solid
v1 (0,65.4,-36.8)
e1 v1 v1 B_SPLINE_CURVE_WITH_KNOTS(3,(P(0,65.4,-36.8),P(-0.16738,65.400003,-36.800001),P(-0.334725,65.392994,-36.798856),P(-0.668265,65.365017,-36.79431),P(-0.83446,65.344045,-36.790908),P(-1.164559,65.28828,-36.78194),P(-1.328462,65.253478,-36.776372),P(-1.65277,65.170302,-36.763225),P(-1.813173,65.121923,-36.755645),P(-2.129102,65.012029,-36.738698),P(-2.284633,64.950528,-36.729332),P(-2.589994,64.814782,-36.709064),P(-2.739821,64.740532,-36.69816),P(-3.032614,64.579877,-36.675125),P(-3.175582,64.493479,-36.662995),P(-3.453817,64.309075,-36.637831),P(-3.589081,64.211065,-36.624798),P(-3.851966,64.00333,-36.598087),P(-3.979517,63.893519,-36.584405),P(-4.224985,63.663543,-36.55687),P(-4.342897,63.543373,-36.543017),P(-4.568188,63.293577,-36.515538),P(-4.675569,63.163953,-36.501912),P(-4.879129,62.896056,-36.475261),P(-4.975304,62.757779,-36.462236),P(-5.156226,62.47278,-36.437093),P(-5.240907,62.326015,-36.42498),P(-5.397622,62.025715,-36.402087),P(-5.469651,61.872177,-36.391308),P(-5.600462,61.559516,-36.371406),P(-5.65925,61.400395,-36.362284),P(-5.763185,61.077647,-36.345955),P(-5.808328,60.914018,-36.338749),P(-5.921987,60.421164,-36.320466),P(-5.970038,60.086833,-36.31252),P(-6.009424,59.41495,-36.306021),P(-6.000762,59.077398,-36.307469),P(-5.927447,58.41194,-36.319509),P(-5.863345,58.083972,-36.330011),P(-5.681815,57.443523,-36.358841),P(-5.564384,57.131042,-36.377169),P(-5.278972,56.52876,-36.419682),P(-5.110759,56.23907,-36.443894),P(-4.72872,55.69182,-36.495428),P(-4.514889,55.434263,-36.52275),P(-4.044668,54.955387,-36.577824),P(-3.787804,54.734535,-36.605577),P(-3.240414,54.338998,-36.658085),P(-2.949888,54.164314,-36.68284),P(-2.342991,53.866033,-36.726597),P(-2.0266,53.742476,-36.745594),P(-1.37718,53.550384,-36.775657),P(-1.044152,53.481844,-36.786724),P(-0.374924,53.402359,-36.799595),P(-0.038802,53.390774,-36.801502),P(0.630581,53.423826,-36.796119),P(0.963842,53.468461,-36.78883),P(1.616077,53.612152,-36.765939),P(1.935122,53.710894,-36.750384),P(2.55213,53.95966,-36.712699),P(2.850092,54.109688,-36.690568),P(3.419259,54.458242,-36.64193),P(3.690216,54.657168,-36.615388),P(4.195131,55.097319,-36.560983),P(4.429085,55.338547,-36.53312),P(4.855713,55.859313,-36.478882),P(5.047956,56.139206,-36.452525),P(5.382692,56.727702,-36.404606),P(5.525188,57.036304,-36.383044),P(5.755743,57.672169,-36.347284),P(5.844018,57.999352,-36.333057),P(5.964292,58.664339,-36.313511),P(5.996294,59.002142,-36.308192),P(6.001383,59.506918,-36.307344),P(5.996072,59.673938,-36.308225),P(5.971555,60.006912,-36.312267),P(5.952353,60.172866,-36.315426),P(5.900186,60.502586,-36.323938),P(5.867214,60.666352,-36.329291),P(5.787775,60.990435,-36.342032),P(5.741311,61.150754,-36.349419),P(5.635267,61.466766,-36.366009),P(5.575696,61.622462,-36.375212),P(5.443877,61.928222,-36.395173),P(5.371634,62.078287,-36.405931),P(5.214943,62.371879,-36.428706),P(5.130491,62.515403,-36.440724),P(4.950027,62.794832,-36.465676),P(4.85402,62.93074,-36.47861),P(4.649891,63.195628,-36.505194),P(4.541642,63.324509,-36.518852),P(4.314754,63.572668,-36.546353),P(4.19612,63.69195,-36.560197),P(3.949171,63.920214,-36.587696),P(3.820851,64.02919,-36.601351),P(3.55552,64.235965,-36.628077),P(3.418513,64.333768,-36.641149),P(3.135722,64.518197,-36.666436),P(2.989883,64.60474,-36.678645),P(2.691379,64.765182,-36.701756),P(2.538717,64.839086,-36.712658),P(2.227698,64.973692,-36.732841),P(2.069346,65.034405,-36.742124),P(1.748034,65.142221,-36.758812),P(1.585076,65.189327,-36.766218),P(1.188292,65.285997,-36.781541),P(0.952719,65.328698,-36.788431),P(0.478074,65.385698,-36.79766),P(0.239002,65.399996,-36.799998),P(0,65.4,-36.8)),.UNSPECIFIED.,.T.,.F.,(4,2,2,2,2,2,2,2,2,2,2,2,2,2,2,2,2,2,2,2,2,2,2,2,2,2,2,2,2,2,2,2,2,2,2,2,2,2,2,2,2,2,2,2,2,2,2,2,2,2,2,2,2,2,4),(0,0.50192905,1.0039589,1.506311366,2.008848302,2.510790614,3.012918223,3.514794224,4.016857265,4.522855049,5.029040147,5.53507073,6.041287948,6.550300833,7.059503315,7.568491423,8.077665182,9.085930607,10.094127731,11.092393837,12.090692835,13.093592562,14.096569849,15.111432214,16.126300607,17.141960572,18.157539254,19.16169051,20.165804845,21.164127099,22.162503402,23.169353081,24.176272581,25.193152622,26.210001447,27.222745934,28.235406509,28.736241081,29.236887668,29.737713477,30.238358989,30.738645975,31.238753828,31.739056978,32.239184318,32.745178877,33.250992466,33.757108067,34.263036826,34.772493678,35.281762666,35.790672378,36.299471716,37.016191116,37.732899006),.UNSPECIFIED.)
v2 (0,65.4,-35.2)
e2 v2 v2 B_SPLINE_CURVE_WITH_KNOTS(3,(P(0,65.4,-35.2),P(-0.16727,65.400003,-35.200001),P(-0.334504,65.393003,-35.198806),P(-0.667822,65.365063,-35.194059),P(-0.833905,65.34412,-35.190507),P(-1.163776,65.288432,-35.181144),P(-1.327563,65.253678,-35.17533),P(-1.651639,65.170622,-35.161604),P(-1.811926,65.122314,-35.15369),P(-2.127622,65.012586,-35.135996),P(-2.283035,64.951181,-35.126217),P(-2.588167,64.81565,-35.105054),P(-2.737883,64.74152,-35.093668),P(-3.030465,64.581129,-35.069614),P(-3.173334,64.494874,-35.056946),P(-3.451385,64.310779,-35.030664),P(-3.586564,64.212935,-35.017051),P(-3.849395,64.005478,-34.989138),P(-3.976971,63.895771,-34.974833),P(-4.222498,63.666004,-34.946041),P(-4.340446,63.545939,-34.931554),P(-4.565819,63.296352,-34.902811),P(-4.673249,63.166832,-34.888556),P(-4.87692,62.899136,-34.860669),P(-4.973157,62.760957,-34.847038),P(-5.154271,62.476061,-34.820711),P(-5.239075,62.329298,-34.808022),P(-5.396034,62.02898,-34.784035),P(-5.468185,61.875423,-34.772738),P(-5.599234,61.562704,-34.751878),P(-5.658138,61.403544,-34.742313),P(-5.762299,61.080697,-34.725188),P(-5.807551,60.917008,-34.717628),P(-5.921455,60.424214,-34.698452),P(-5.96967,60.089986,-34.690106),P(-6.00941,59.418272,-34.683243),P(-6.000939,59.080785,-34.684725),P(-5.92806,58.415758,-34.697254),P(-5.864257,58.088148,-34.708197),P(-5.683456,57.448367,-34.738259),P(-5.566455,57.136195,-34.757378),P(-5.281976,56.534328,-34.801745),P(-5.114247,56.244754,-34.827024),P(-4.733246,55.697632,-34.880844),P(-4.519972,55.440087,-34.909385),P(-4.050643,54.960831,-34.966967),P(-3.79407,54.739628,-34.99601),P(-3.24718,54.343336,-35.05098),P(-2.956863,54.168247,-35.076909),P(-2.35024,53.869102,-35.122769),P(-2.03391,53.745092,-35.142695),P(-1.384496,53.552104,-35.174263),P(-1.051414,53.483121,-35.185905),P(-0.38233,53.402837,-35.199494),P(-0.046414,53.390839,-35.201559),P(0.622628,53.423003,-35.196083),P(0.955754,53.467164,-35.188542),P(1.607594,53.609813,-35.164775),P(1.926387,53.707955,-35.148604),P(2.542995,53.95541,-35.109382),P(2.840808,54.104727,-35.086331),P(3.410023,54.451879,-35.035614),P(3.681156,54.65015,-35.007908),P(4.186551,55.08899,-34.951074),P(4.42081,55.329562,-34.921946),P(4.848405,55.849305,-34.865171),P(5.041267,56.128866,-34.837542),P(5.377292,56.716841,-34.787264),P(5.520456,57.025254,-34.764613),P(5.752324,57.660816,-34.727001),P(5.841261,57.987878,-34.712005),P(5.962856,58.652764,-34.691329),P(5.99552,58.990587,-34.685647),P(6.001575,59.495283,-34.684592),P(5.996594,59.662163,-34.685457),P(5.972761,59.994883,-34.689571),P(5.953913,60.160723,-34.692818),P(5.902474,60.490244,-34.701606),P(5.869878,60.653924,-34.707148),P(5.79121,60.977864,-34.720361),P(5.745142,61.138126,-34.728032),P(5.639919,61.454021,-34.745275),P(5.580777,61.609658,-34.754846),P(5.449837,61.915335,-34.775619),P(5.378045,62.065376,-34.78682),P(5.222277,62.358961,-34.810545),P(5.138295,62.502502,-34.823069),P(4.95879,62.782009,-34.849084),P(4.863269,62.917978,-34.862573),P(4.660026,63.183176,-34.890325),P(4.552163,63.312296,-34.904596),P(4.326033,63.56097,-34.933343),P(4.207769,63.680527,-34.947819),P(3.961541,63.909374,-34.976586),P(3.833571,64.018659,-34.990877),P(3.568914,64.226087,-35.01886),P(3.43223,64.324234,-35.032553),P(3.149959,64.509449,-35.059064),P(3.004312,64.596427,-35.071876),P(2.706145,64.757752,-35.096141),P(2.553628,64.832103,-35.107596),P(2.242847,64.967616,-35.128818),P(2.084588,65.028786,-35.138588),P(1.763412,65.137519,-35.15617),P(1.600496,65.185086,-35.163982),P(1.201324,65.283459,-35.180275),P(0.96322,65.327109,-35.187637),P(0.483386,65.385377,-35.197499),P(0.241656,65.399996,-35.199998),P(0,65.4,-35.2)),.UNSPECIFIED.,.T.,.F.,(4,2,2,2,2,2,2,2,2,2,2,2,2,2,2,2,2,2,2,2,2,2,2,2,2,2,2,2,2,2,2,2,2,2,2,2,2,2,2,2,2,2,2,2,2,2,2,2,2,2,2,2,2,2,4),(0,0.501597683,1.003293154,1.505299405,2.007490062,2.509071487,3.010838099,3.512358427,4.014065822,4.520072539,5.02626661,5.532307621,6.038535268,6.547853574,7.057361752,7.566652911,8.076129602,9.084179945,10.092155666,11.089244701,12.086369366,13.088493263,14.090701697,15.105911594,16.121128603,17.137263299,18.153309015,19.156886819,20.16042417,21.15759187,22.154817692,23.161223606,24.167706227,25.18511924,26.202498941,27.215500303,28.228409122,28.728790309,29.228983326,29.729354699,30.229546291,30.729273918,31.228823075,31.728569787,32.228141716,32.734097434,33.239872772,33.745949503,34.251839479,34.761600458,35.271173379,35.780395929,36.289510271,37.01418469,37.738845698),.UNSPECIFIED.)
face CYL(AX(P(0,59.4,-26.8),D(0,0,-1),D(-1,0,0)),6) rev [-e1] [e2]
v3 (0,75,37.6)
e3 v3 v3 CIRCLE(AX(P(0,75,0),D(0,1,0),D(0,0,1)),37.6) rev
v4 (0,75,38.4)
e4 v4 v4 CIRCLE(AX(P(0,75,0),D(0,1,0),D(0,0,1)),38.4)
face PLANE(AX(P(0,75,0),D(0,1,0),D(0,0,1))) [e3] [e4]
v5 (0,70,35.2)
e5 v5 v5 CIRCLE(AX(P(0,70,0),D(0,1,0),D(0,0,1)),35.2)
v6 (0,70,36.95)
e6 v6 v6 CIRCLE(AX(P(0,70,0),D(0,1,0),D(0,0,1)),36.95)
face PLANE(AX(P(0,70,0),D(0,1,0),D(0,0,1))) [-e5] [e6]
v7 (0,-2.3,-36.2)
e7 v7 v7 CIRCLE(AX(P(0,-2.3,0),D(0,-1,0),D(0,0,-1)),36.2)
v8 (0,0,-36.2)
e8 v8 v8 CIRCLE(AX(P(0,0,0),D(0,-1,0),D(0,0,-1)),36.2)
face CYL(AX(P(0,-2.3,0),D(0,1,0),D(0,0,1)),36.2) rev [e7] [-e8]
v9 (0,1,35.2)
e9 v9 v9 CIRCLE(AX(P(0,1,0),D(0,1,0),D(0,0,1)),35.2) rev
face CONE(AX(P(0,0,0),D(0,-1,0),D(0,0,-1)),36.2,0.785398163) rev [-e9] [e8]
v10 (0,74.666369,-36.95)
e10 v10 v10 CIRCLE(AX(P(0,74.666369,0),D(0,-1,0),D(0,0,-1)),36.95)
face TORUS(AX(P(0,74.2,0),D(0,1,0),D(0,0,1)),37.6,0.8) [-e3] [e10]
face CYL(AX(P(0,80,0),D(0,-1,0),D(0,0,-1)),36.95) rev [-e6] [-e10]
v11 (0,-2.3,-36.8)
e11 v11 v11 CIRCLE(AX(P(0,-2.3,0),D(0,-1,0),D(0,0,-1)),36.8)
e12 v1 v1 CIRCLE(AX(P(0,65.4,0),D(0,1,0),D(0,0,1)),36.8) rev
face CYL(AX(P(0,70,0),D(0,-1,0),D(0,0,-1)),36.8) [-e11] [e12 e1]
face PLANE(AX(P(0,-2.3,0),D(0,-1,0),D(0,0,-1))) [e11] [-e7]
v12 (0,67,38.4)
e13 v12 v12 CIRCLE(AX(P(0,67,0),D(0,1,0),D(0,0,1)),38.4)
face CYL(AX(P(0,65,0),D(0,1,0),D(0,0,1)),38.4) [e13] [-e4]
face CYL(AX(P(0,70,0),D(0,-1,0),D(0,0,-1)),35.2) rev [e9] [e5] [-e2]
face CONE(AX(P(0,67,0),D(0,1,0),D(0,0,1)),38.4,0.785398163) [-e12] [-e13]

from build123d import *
from build123d.topology import SkipClean

# Parameters (mm, degrees)
SKETCH1_R                = 36.8
SKETCH1_R_2              = 35.2
BOSS_EXTRUDE1_DEPTH      = 70
BOSS_EXTRUDE2_DEPTH      = 5
BOSS_EXTRUDE2_DEPTH_BACK = 5
SKETCH2_R                = 38.4
SKETCH2_R_2              = 36.8
CHAMFER1_SIZE            = 2
FILLET1_R                = 0.8
BOSS_EXTRUDE3_START      = 2.3
SKETCH3_R                = 36.8
SKETCH3_R_2              = 36.2
BOSS_EXTRUDE3_DEPTH      = 2.3
CHAMFER2_SIZE            = 1
SKETCH5_R                = 36.95
CUT_EXTRUDE1_DEPTH       = 10
SKETCH6_R                = 6
CUT_EXTRUDE2_DEPTH       = 10


# Some blends are built 0.0001 mm under size
with BuildPart() as part:
    # Sketch1 → Boss-Extrude1 (new body)
    with BuildSketch(Plane(origin=(0, 0, 0), x_dir=(1, 0, 0), z_dir=(0, 1, 0))):
        with Locations(Location((0, 0, 0), (0, 0, 270))):
            Circle(SKETCH1_R)
        with Locations(Location((0, 0, 0), (0, 0, 270))):
            Circle(SKETCH1_R_2, mode=Mode.SUBTRACT)
    extrude(amount=BOSS_EXTRUDE1_DEPTH)

    # Sketch2 → Boss-Extrude2 (add, two sides: drawn at the far end of the back side and taken through both)
    with BuildSketch(Plane(origin=(0, 70, 0), x_dir=(1, 0, 0), z_dir=(0, 1, 0)).offset(-BOSS_EXTRUDE2_DEPTH_BACK)):
        with Locations(Location((0, 0, 0), (0, 0, 270))):
            Circle(SKETCH2_R)
        with Locations(Location((0, 0, 0), (0, 0, 270))):
            Circle(SKETCH2_R_2, mode=Mode.SUBTRACT)
    extrude(amount=BOSS_EXTRUDE2_DEPTH + BOSS_EXTRUDE2_DEPTH_BACK)

    # Chamfer1
    # the kernel refuses this chamfer: 2 mm, written as the material it takes off along each edge
    with BuildSketch(Plane(origin=(0, 65, 0), x_dir=(0, 0, 1), z_dir=(-1, 0, 0))) as chamfer1_piece_1_section:
        Polygon((38.4 - CHAMFER1_SIZE, 0), (38.4, CHAMFER1_SIZE), (38.4, 0), align=None)
    chamfer1_piece_1 = revolve(axis=Axis((0, 65, 0), (0, 1, 0)), mode=Mode.PRIVATE)
    chamfer1_piece_1 = chamfer1_piece_1 - Plane(origin=(0, 66.172330508, 0), x_dir=(0, 0, 1), z_dir=(0, -1, 0)) * Cylinder(36.8, 154, mode=Mode.PRIVATE)
    add(chamfer1_piece_1, mode=Mode.SUBTRACT)

    # Fillet1
    fillet1_edges = [part.edges().sort_by_distance(p)[0] for p in [
        (0, 75, -36.8),
    ]]
    fillet(fillet1_edges, radius=FILLET1_R)

    # Sketch3 → Boss-Extrude3 (add)
    with BuildSketch(Plane.XZ.offset(BOSS_EXTRUDE3_START)):
        with Locations(Location((0, 0, 0), (0, 0, 270))):
            Circle(SKETCH3_R)
        with Locations(Location((0, 0, 0), (0, 0, 270))):
            Circle(SKETCH3_R_2, mode=Mode.SUBTRACT)
    extrude(amount=-BOSS_EXTRUDE3_DEPTH)

    # Chamfer2
    chamfer2_edges = [part.edges().sort_by_distance(p)[0] for p in [
        (0, 0, -35.2),
    ]]
    chamfer(chamfer2_edges, length=CHAMFER2_SIZE - 0.0001)  # a hair under: the kernel refuses the full size

    # Sketch5 → Cut-Extrude1 (cut)
    with BuildSketch(Plane(origin=(0, 70, 0), x_dir=(1, 0, 0), z_dir=(0, 1, 0))):
        with Locations(Location((0, 0, 0), (0, 0, 270))):
            Circle(SKETCH5_R)
    extrude(amount=CUT_EXTRUDE1_DEPTH, mode=Mode.SUBTRACT)

    # Sketch6 → Cut-Extrude2 (cut)
    with SkipClean():  # the faces are left unmerged after this step: merging them gives an invalid solid
        with BuildSketch(Plane(origin=(0, 0, -36.8), x_dir=(-1, 0, 0), z_dir=(0, 0, -1))):
            with Locations(Location((0, 59.4, 0), (0, 0, 90))):
                Circle(SKETCH6_R)
        extrude(amount=-CUT_EXTRUDE2_DEPTH, mode=Mode.SUBTRACT)


solid = part.part
